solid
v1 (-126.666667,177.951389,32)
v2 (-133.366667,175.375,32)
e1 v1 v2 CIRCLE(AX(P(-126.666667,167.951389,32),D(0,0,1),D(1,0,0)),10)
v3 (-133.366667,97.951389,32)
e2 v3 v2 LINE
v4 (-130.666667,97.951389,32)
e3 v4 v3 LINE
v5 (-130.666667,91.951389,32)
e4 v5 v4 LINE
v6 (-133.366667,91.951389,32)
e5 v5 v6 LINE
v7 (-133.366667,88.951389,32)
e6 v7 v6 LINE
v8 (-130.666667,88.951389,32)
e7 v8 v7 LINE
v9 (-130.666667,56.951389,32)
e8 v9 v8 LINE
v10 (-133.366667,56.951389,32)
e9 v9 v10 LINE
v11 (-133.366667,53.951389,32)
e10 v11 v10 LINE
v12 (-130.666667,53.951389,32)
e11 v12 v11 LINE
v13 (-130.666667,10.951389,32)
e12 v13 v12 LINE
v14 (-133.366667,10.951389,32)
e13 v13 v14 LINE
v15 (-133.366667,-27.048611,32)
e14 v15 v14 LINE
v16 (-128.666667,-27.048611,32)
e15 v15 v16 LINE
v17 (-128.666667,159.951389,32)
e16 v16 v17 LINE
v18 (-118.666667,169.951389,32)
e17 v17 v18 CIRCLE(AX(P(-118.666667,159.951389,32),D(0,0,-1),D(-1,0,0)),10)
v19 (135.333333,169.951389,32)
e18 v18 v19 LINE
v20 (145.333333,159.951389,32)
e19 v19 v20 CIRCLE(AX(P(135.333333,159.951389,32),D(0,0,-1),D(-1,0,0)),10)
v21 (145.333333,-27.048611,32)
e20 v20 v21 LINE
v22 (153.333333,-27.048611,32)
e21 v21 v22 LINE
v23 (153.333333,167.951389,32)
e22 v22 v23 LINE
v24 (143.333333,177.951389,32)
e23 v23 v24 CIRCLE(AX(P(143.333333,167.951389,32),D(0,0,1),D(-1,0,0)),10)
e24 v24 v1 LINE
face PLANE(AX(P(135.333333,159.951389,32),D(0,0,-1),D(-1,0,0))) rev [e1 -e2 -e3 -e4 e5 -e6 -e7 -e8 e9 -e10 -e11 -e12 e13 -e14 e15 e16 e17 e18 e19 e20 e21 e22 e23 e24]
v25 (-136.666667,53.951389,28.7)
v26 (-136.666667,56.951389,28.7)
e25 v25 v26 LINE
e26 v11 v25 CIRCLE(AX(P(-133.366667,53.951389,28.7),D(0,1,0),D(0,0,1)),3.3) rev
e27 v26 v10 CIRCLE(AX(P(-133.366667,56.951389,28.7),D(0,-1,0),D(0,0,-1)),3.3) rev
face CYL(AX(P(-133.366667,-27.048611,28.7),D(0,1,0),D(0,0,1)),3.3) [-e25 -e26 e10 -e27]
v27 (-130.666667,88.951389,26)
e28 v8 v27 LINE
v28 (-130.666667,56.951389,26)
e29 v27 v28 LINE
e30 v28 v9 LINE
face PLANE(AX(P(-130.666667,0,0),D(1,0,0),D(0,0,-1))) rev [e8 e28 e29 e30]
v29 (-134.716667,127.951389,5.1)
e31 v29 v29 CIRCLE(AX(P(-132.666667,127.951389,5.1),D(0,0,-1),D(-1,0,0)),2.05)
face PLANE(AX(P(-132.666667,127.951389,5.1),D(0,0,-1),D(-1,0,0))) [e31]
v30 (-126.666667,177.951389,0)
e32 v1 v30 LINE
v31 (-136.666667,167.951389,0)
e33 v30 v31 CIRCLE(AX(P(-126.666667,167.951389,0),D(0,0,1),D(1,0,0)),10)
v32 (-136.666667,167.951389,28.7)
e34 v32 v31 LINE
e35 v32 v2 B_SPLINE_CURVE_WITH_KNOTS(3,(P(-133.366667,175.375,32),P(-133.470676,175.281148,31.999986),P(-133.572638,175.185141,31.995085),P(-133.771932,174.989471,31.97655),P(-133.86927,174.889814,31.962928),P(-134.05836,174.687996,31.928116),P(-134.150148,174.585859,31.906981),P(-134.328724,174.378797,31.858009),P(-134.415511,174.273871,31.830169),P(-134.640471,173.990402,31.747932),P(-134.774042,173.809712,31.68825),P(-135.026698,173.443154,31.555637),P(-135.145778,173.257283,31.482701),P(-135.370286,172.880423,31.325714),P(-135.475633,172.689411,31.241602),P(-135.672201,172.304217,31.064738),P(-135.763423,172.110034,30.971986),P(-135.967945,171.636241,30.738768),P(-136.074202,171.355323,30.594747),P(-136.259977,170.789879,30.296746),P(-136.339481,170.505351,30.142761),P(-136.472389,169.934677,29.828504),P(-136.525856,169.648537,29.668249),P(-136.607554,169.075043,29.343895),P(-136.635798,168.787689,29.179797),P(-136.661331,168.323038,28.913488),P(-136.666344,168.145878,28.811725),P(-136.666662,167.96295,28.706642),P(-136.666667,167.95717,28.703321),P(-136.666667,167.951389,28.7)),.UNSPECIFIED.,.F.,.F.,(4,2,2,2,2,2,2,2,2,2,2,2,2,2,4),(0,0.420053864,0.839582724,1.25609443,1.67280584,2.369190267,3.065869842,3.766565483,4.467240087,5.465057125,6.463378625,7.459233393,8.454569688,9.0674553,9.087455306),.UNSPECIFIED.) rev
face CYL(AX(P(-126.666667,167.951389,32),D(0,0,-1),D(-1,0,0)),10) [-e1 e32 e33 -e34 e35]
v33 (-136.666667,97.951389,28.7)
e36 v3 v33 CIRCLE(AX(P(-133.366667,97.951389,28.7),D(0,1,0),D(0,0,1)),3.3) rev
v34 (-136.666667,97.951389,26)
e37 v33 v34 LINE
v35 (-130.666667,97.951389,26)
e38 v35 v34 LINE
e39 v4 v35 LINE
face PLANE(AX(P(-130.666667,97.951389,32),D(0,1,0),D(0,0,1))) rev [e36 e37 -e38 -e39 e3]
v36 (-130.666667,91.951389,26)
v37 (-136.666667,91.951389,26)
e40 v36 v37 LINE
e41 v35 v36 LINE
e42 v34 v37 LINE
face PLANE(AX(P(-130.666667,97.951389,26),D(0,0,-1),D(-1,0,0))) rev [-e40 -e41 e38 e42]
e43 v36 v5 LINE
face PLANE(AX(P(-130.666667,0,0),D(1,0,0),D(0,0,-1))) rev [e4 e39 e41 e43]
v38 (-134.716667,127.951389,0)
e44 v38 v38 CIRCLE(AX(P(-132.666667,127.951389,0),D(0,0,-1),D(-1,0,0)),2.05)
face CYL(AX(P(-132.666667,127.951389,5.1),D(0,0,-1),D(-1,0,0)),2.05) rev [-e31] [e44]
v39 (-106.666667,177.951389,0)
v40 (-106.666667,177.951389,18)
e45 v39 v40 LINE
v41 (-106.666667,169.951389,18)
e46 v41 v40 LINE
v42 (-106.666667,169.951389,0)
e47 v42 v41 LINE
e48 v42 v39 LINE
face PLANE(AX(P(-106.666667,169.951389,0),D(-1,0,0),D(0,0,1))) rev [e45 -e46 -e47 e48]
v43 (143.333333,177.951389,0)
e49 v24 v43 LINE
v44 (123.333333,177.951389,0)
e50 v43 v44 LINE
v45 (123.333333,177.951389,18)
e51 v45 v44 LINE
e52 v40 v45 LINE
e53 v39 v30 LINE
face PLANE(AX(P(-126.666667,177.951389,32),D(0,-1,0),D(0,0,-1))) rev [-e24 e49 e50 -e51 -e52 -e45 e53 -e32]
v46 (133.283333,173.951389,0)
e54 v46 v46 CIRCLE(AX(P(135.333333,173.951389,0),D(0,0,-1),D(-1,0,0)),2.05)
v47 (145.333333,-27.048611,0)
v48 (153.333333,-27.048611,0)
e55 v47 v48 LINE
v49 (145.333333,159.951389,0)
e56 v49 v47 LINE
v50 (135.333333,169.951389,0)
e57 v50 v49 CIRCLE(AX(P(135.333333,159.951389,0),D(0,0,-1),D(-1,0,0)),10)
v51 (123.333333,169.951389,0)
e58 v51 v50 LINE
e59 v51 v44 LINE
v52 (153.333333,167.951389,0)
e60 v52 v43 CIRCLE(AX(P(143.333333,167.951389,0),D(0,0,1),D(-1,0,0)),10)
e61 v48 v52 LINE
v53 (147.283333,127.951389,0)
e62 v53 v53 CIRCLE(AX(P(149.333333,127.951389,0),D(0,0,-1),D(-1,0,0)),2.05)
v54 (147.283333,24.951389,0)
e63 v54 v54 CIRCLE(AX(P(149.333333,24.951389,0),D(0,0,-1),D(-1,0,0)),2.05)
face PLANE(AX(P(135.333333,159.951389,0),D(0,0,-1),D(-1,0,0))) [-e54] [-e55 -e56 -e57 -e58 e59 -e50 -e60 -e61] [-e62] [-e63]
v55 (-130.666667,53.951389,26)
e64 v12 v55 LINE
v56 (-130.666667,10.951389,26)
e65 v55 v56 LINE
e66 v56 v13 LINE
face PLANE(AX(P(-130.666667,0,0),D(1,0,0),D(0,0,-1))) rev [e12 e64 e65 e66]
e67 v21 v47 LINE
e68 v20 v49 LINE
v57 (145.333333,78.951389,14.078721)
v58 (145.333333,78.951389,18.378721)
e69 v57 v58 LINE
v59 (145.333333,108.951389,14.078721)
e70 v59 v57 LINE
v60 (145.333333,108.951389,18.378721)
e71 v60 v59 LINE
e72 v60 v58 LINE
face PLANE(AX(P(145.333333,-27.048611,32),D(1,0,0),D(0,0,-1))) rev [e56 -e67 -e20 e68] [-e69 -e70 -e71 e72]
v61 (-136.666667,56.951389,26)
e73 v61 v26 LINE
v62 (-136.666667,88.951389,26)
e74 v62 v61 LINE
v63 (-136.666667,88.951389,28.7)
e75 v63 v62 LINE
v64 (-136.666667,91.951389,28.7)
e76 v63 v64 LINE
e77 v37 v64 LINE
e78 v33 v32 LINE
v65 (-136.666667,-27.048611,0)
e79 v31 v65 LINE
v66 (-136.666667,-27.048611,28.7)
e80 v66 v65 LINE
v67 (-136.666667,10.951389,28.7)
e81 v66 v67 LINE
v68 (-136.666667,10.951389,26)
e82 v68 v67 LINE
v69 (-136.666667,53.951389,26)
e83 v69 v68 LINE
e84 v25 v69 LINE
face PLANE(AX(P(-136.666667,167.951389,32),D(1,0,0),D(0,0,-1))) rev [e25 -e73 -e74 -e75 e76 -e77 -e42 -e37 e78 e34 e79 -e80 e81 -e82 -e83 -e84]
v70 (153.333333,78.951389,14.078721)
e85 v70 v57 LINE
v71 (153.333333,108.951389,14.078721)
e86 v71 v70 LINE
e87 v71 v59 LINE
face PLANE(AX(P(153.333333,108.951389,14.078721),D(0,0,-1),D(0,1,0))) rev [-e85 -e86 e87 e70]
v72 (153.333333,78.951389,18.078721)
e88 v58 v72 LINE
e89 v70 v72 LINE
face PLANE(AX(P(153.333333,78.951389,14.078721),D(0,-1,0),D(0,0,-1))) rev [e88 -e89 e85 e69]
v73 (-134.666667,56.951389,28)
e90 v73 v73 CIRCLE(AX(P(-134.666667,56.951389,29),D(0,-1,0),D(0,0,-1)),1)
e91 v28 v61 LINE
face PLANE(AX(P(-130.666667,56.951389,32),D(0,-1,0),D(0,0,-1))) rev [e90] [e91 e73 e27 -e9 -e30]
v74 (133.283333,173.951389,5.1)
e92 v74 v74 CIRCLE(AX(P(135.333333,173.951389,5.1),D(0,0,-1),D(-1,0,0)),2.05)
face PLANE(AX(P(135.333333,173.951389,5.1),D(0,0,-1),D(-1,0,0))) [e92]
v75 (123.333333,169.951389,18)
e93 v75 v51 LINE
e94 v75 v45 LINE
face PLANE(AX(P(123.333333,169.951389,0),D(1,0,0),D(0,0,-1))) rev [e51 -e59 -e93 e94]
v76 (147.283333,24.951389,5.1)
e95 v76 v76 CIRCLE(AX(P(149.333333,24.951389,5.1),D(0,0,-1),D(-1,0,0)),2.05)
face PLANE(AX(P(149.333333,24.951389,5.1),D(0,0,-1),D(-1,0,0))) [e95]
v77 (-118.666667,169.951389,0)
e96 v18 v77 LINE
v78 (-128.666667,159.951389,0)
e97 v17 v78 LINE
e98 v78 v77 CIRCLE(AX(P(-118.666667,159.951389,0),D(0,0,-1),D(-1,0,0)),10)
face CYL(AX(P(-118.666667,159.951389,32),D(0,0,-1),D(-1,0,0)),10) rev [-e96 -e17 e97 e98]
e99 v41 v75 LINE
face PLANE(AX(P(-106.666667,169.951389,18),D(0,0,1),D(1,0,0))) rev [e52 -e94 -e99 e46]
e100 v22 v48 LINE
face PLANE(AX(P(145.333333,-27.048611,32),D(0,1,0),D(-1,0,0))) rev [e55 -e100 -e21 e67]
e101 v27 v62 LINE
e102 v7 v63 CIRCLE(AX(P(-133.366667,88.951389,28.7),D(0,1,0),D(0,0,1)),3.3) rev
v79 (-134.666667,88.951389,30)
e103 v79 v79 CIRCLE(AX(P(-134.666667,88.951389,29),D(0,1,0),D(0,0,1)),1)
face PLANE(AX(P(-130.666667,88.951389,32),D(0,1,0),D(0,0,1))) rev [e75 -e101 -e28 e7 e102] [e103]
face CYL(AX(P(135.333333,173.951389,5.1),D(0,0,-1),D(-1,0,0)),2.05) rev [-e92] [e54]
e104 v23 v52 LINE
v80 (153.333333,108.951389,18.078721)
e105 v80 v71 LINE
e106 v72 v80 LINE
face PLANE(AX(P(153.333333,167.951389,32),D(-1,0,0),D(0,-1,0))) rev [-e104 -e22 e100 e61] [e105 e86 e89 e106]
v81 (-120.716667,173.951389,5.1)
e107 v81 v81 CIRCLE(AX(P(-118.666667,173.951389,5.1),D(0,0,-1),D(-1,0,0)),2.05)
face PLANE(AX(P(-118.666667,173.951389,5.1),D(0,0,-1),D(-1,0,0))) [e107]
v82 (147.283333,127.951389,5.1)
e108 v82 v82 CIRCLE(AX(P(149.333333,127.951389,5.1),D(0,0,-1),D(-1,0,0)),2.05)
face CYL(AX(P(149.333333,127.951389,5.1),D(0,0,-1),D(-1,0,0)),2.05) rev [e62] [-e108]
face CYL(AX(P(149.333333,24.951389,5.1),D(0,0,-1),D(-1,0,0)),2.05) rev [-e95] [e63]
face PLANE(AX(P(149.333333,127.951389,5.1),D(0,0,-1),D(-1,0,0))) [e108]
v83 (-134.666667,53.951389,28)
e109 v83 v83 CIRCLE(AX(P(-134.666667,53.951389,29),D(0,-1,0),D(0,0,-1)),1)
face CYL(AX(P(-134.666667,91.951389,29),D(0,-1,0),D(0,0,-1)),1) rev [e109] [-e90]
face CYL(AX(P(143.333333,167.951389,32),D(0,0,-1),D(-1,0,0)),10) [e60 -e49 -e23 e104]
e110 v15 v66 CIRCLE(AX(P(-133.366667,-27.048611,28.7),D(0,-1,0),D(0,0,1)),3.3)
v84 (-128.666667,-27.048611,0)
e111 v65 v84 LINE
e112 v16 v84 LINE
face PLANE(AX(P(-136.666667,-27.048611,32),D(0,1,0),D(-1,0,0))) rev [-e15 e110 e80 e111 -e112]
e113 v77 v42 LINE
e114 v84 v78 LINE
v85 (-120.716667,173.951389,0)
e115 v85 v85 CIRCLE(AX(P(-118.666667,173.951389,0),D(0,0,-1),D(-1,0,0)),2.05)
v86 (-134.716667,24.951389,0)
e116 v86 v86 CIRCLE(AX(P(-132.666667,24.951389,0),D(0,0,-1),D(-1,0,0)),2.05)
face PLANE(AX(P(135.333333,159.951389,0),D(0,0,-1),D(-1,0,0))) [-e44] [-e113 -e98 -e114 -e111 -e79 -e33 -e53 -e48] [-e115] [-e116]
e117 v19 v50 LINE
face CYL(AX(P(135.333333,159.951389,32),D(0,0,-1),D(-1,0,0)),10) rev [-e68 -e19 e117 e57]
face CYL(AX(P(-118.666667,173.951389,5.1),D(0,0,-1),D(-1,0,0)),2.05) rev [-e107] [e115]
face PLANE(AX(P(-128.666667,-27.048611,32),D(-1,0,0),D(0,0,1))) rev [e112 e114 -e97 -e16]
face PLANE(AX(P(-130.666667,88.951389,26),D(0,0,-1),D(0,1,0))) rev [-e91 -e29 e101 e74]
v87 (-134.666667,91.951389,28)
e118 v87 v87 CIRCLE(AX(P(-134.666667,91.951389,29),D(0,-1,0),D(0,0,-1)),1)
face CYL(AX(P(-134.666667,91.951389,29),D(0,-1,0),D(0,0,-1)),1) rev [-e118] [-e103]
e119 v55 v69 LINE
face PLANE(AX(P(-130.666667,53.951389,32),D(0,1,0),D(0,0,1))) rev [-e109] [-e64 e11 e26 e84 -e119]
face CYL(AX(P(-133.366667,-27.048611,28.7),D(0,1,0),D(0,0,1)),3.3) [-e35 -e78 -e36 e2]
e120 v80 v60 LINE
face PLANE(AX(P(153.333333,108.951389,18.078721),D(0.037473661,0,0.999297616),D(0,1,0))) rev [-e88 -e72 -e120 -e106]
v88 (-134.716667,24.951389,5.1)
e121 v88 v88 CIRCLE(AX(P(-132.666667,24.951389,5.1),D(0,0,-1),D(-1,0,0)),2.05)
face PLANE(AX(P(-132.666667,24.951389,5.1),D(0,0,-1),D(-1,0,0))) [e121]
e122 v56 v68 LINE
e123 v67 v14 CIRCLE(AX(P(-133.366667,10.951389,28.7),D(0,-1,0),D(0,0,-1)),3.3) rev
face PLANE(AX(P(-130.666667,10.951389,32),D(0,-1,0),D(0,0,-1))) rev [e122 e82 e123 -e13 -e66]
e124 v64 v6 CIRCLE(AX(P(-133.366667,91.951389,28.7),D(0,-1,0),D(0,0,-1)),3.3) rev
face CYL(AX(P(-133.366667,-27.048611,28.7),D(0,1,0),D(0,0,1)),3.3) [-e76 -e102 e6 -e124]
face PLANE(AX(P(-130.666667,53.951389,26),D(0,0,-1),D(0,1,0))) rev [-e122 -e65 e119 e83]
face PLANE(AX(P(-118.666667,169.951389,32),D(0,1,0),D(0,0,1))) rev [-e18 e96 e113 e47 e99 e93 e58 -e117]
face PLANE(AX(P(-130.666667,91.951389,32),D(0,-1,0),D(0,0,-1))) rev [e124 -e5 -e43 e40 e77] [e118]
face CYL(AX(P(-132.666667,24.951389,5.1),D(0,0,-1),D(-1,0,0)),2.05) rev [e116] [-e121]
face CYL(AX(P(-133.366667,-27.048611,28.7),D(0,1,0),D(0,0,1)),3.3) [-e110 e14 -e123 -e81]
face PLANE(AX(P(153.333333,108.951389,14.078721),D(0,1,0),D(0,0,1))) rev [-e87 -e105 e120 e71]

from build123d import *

# Parameters (mm, degrees)
EXTRUDE_1_DEPTH     = 32
SKETCH_2_R          = 2.05
CUT_EXTRUDE_1_DEPTH = 5.1
SKETCH_3_W          = 230
SKETCH_3_H          = 18
CUT_EXTRUDE_2_DEPTH = 8
SKETCH_4_W          = 6
SKETCH_4_H          = 32
SKETCH_4_H_2        = 6
SKETCH_4_H_3        = 43
CUT_EXTRUDE_3_DEPTH = 6
SKETCH_5_R          = 1
CUT_EXTRUDE_4_DEPTH = 38
SKETCH_6_W          = 4
SKETCH_6_H          = 30
CUT_EXTRUDE_5_DEPTH = 335.984621748
CHAMFER_1_SIZE2     = 8
CHAMFER_1_SIZE      = 0.3
CUT_EXTRUDE_6_DEPTH = 258.992463284


with BuildPart() as part:
    # 草图1 → 凸台-拉伸1 (new body)
    with BuildSketch(Plane.XY):
        with BuildLine():
            Line((145.333333333, -27.048611111), (153.333333333, -27.048611111))
            Line((153.333333333, -27.048611111), (153.333333333, 167.951388889))
            ThreePointArc((153.333333333, 167.951388889), (150.404401145, 175.022456701), (143.333333333, 177.951388889))
            Line((143.333333333, 177.951388889), (-126.666666667, 177.951388889))
            ThreePointArc((-126.666666667, 177.951388889), (-133.737734479, 175.022456701), (-136.666666667, 167.951388889))
            Line((-136.666666667, 167.951388889), (-136.666666667, -27.048611111))
            Line((-136.666666667, -27.048611111), (-128.666666667, -27.048611111))
            Line((-128.666666667, -27.048611111), (-128.666666667, 159.951388889))
            ThreePointArc((-128.666666667, 159.951388889), (-125.737734479, 167.022456701), (-118.666666667, 169.951388889))
            Line((-118.666666667, 169.951388889), (135.333333333, 169.951388889))
            ThreePointArc((135.333333333, 169.951388889), (142.404401145, 167.022456701), (145.333333333, 159.951388889))
            Line((145.333333333, 159.951388889), (145.333333333, -27.048611111))
        make_face()
    extrude(amount=EXTRUDE_1_DEPTH)

    # 草图2 → 切除-拉伸1 (cut)
    with BuildSketch(Plane(origin=(0, 0, 0), x_dir=(-1, 0, 0), z_dir=(0, 0, -1))):
        with Locations((132.666666667, 127.951388889)):
            Circle(SKETCH_2_R)
        with Locations((132.666666667, 24.951388889)):
            Circle(SKETCH_2_R)
        with Locations((-149.333333333, 127.951388889)):
            Circle(SKETCH_2_R)
        with Locations((-149.333333333, 24.951388889)):
            Circle(SKETCH_2_R)
        with Locations((-135.333333333, 173.951388889)):
            Circle(SKETCH_2_R)
        with Locations((-8.333333333, 173.951388889)):
            Circle(SKETCH_2_R)
        with Locations((118.666666667, 173.951388889)):
            Circle(SKETCH_2_R)
    extrude(amount=-CUT_EXTRUDE_1_DEPTH, mode=Mode.SUBTRACT)

    # 草图3 → 切除-拉伸2 (cut)
    with BuildSketch(Plane(origin=(0, 177.951388889, 0), x_dir=(1, 0, 0), z_dir=(0, 1, 0))):
        with Locations((8.333333333, -9)):
            Rectangle(SKETCH_3_W, SKETCH_3_H)
    extrude(amount=-CUT_EXTRUDE_2_DEPTH, mode=Mode.SUBTRACT)

    # 草图4 → 切除-拉伸3 (cut)
    with BuildSketch(Plane.ZY.offset(136.666666667)):
        with Locations((29, 72.951388889)):
            Rectangle(SKETCH_4_W, SKETCH_4_H)
        with Locations((29, 94.951388889)):
            Rectangle(SKETCH_4_W, SKETCH_4_H_2)
        with Locations((29, 32.451388889)):
            Rectangle(SKETCH_4_W, SKETCH_4_H_3)
    extrude(amount=-CUT_EXTRUDE_3_DEPTH, mode=Mode.SUBTRACT)

    # 草图5 → 切除-拉伸4 (cut)
    with BuildSketch(Plane.XZ.offset(-53.951388889)):
        with Locations(Location((-134.666666667, 29, 0), (0, 0, 270))):
            Circle(SKETCH_5_R)
    extrude(amount=-CUT_EXTRUDE_4_DEPTH, mode=Mode.SUBTRACT)

    # 草图6 → 切除-拉伸5 (cut, through all)
    with BuildSketch(Plane.ZY.offset(-145.333333333)):
        with Locations((16.078720605, 93.951388889)):
            Rectangle(SKETCH_6_W, SKETCH_6_H)
    extrude(amount=-CUT_EXTRUDE_5_DEPTH, mode=Mode.SUBTRACT)

    # 倒角1
    chamfer_1_edges = [part.edges().sort_by_distance(p)[0] for p in [
        (145.333333333, 93.951388889, 18.078720605),
    ]]
    chamfer_1_side = [part.faces().sort_by_distance(p)[0] for p in [
        (145.333333333, 93.951388889, 18.084720605),
    ]]
    chamfer(chamfer_1_edges, length=CHAMFER_1_SIZE - 0.0001, length2=CHAMFER_1_SIZE2 - 0.0001, reference=chamfer_1_side[0])  # a hair under: the kernel refuses the full size

    # 草图7 → 切除-拉伸6 (cut, through all)
    with BuildSketch(Plane(origin=(0, 177.951388889, 0), x_dir=(1, 0, 0), z_dir=(0, 1, 0))):
        with BuildLine():
            Line((-136.666666667, -28.7), (-136.666666667, -32))
            Line((-136.666666667, -32), (-133.366666667, -32))
            ThreePointArc((-133.366666667, -32), (-135.700119045, -31.033452378), (-136.666666667, -28.7))
        make_face()
    extrude(amount=-CUT_EXTRUDE_6_DEPTH, mode=Mode.SUBTRACT)


solid = part.part
